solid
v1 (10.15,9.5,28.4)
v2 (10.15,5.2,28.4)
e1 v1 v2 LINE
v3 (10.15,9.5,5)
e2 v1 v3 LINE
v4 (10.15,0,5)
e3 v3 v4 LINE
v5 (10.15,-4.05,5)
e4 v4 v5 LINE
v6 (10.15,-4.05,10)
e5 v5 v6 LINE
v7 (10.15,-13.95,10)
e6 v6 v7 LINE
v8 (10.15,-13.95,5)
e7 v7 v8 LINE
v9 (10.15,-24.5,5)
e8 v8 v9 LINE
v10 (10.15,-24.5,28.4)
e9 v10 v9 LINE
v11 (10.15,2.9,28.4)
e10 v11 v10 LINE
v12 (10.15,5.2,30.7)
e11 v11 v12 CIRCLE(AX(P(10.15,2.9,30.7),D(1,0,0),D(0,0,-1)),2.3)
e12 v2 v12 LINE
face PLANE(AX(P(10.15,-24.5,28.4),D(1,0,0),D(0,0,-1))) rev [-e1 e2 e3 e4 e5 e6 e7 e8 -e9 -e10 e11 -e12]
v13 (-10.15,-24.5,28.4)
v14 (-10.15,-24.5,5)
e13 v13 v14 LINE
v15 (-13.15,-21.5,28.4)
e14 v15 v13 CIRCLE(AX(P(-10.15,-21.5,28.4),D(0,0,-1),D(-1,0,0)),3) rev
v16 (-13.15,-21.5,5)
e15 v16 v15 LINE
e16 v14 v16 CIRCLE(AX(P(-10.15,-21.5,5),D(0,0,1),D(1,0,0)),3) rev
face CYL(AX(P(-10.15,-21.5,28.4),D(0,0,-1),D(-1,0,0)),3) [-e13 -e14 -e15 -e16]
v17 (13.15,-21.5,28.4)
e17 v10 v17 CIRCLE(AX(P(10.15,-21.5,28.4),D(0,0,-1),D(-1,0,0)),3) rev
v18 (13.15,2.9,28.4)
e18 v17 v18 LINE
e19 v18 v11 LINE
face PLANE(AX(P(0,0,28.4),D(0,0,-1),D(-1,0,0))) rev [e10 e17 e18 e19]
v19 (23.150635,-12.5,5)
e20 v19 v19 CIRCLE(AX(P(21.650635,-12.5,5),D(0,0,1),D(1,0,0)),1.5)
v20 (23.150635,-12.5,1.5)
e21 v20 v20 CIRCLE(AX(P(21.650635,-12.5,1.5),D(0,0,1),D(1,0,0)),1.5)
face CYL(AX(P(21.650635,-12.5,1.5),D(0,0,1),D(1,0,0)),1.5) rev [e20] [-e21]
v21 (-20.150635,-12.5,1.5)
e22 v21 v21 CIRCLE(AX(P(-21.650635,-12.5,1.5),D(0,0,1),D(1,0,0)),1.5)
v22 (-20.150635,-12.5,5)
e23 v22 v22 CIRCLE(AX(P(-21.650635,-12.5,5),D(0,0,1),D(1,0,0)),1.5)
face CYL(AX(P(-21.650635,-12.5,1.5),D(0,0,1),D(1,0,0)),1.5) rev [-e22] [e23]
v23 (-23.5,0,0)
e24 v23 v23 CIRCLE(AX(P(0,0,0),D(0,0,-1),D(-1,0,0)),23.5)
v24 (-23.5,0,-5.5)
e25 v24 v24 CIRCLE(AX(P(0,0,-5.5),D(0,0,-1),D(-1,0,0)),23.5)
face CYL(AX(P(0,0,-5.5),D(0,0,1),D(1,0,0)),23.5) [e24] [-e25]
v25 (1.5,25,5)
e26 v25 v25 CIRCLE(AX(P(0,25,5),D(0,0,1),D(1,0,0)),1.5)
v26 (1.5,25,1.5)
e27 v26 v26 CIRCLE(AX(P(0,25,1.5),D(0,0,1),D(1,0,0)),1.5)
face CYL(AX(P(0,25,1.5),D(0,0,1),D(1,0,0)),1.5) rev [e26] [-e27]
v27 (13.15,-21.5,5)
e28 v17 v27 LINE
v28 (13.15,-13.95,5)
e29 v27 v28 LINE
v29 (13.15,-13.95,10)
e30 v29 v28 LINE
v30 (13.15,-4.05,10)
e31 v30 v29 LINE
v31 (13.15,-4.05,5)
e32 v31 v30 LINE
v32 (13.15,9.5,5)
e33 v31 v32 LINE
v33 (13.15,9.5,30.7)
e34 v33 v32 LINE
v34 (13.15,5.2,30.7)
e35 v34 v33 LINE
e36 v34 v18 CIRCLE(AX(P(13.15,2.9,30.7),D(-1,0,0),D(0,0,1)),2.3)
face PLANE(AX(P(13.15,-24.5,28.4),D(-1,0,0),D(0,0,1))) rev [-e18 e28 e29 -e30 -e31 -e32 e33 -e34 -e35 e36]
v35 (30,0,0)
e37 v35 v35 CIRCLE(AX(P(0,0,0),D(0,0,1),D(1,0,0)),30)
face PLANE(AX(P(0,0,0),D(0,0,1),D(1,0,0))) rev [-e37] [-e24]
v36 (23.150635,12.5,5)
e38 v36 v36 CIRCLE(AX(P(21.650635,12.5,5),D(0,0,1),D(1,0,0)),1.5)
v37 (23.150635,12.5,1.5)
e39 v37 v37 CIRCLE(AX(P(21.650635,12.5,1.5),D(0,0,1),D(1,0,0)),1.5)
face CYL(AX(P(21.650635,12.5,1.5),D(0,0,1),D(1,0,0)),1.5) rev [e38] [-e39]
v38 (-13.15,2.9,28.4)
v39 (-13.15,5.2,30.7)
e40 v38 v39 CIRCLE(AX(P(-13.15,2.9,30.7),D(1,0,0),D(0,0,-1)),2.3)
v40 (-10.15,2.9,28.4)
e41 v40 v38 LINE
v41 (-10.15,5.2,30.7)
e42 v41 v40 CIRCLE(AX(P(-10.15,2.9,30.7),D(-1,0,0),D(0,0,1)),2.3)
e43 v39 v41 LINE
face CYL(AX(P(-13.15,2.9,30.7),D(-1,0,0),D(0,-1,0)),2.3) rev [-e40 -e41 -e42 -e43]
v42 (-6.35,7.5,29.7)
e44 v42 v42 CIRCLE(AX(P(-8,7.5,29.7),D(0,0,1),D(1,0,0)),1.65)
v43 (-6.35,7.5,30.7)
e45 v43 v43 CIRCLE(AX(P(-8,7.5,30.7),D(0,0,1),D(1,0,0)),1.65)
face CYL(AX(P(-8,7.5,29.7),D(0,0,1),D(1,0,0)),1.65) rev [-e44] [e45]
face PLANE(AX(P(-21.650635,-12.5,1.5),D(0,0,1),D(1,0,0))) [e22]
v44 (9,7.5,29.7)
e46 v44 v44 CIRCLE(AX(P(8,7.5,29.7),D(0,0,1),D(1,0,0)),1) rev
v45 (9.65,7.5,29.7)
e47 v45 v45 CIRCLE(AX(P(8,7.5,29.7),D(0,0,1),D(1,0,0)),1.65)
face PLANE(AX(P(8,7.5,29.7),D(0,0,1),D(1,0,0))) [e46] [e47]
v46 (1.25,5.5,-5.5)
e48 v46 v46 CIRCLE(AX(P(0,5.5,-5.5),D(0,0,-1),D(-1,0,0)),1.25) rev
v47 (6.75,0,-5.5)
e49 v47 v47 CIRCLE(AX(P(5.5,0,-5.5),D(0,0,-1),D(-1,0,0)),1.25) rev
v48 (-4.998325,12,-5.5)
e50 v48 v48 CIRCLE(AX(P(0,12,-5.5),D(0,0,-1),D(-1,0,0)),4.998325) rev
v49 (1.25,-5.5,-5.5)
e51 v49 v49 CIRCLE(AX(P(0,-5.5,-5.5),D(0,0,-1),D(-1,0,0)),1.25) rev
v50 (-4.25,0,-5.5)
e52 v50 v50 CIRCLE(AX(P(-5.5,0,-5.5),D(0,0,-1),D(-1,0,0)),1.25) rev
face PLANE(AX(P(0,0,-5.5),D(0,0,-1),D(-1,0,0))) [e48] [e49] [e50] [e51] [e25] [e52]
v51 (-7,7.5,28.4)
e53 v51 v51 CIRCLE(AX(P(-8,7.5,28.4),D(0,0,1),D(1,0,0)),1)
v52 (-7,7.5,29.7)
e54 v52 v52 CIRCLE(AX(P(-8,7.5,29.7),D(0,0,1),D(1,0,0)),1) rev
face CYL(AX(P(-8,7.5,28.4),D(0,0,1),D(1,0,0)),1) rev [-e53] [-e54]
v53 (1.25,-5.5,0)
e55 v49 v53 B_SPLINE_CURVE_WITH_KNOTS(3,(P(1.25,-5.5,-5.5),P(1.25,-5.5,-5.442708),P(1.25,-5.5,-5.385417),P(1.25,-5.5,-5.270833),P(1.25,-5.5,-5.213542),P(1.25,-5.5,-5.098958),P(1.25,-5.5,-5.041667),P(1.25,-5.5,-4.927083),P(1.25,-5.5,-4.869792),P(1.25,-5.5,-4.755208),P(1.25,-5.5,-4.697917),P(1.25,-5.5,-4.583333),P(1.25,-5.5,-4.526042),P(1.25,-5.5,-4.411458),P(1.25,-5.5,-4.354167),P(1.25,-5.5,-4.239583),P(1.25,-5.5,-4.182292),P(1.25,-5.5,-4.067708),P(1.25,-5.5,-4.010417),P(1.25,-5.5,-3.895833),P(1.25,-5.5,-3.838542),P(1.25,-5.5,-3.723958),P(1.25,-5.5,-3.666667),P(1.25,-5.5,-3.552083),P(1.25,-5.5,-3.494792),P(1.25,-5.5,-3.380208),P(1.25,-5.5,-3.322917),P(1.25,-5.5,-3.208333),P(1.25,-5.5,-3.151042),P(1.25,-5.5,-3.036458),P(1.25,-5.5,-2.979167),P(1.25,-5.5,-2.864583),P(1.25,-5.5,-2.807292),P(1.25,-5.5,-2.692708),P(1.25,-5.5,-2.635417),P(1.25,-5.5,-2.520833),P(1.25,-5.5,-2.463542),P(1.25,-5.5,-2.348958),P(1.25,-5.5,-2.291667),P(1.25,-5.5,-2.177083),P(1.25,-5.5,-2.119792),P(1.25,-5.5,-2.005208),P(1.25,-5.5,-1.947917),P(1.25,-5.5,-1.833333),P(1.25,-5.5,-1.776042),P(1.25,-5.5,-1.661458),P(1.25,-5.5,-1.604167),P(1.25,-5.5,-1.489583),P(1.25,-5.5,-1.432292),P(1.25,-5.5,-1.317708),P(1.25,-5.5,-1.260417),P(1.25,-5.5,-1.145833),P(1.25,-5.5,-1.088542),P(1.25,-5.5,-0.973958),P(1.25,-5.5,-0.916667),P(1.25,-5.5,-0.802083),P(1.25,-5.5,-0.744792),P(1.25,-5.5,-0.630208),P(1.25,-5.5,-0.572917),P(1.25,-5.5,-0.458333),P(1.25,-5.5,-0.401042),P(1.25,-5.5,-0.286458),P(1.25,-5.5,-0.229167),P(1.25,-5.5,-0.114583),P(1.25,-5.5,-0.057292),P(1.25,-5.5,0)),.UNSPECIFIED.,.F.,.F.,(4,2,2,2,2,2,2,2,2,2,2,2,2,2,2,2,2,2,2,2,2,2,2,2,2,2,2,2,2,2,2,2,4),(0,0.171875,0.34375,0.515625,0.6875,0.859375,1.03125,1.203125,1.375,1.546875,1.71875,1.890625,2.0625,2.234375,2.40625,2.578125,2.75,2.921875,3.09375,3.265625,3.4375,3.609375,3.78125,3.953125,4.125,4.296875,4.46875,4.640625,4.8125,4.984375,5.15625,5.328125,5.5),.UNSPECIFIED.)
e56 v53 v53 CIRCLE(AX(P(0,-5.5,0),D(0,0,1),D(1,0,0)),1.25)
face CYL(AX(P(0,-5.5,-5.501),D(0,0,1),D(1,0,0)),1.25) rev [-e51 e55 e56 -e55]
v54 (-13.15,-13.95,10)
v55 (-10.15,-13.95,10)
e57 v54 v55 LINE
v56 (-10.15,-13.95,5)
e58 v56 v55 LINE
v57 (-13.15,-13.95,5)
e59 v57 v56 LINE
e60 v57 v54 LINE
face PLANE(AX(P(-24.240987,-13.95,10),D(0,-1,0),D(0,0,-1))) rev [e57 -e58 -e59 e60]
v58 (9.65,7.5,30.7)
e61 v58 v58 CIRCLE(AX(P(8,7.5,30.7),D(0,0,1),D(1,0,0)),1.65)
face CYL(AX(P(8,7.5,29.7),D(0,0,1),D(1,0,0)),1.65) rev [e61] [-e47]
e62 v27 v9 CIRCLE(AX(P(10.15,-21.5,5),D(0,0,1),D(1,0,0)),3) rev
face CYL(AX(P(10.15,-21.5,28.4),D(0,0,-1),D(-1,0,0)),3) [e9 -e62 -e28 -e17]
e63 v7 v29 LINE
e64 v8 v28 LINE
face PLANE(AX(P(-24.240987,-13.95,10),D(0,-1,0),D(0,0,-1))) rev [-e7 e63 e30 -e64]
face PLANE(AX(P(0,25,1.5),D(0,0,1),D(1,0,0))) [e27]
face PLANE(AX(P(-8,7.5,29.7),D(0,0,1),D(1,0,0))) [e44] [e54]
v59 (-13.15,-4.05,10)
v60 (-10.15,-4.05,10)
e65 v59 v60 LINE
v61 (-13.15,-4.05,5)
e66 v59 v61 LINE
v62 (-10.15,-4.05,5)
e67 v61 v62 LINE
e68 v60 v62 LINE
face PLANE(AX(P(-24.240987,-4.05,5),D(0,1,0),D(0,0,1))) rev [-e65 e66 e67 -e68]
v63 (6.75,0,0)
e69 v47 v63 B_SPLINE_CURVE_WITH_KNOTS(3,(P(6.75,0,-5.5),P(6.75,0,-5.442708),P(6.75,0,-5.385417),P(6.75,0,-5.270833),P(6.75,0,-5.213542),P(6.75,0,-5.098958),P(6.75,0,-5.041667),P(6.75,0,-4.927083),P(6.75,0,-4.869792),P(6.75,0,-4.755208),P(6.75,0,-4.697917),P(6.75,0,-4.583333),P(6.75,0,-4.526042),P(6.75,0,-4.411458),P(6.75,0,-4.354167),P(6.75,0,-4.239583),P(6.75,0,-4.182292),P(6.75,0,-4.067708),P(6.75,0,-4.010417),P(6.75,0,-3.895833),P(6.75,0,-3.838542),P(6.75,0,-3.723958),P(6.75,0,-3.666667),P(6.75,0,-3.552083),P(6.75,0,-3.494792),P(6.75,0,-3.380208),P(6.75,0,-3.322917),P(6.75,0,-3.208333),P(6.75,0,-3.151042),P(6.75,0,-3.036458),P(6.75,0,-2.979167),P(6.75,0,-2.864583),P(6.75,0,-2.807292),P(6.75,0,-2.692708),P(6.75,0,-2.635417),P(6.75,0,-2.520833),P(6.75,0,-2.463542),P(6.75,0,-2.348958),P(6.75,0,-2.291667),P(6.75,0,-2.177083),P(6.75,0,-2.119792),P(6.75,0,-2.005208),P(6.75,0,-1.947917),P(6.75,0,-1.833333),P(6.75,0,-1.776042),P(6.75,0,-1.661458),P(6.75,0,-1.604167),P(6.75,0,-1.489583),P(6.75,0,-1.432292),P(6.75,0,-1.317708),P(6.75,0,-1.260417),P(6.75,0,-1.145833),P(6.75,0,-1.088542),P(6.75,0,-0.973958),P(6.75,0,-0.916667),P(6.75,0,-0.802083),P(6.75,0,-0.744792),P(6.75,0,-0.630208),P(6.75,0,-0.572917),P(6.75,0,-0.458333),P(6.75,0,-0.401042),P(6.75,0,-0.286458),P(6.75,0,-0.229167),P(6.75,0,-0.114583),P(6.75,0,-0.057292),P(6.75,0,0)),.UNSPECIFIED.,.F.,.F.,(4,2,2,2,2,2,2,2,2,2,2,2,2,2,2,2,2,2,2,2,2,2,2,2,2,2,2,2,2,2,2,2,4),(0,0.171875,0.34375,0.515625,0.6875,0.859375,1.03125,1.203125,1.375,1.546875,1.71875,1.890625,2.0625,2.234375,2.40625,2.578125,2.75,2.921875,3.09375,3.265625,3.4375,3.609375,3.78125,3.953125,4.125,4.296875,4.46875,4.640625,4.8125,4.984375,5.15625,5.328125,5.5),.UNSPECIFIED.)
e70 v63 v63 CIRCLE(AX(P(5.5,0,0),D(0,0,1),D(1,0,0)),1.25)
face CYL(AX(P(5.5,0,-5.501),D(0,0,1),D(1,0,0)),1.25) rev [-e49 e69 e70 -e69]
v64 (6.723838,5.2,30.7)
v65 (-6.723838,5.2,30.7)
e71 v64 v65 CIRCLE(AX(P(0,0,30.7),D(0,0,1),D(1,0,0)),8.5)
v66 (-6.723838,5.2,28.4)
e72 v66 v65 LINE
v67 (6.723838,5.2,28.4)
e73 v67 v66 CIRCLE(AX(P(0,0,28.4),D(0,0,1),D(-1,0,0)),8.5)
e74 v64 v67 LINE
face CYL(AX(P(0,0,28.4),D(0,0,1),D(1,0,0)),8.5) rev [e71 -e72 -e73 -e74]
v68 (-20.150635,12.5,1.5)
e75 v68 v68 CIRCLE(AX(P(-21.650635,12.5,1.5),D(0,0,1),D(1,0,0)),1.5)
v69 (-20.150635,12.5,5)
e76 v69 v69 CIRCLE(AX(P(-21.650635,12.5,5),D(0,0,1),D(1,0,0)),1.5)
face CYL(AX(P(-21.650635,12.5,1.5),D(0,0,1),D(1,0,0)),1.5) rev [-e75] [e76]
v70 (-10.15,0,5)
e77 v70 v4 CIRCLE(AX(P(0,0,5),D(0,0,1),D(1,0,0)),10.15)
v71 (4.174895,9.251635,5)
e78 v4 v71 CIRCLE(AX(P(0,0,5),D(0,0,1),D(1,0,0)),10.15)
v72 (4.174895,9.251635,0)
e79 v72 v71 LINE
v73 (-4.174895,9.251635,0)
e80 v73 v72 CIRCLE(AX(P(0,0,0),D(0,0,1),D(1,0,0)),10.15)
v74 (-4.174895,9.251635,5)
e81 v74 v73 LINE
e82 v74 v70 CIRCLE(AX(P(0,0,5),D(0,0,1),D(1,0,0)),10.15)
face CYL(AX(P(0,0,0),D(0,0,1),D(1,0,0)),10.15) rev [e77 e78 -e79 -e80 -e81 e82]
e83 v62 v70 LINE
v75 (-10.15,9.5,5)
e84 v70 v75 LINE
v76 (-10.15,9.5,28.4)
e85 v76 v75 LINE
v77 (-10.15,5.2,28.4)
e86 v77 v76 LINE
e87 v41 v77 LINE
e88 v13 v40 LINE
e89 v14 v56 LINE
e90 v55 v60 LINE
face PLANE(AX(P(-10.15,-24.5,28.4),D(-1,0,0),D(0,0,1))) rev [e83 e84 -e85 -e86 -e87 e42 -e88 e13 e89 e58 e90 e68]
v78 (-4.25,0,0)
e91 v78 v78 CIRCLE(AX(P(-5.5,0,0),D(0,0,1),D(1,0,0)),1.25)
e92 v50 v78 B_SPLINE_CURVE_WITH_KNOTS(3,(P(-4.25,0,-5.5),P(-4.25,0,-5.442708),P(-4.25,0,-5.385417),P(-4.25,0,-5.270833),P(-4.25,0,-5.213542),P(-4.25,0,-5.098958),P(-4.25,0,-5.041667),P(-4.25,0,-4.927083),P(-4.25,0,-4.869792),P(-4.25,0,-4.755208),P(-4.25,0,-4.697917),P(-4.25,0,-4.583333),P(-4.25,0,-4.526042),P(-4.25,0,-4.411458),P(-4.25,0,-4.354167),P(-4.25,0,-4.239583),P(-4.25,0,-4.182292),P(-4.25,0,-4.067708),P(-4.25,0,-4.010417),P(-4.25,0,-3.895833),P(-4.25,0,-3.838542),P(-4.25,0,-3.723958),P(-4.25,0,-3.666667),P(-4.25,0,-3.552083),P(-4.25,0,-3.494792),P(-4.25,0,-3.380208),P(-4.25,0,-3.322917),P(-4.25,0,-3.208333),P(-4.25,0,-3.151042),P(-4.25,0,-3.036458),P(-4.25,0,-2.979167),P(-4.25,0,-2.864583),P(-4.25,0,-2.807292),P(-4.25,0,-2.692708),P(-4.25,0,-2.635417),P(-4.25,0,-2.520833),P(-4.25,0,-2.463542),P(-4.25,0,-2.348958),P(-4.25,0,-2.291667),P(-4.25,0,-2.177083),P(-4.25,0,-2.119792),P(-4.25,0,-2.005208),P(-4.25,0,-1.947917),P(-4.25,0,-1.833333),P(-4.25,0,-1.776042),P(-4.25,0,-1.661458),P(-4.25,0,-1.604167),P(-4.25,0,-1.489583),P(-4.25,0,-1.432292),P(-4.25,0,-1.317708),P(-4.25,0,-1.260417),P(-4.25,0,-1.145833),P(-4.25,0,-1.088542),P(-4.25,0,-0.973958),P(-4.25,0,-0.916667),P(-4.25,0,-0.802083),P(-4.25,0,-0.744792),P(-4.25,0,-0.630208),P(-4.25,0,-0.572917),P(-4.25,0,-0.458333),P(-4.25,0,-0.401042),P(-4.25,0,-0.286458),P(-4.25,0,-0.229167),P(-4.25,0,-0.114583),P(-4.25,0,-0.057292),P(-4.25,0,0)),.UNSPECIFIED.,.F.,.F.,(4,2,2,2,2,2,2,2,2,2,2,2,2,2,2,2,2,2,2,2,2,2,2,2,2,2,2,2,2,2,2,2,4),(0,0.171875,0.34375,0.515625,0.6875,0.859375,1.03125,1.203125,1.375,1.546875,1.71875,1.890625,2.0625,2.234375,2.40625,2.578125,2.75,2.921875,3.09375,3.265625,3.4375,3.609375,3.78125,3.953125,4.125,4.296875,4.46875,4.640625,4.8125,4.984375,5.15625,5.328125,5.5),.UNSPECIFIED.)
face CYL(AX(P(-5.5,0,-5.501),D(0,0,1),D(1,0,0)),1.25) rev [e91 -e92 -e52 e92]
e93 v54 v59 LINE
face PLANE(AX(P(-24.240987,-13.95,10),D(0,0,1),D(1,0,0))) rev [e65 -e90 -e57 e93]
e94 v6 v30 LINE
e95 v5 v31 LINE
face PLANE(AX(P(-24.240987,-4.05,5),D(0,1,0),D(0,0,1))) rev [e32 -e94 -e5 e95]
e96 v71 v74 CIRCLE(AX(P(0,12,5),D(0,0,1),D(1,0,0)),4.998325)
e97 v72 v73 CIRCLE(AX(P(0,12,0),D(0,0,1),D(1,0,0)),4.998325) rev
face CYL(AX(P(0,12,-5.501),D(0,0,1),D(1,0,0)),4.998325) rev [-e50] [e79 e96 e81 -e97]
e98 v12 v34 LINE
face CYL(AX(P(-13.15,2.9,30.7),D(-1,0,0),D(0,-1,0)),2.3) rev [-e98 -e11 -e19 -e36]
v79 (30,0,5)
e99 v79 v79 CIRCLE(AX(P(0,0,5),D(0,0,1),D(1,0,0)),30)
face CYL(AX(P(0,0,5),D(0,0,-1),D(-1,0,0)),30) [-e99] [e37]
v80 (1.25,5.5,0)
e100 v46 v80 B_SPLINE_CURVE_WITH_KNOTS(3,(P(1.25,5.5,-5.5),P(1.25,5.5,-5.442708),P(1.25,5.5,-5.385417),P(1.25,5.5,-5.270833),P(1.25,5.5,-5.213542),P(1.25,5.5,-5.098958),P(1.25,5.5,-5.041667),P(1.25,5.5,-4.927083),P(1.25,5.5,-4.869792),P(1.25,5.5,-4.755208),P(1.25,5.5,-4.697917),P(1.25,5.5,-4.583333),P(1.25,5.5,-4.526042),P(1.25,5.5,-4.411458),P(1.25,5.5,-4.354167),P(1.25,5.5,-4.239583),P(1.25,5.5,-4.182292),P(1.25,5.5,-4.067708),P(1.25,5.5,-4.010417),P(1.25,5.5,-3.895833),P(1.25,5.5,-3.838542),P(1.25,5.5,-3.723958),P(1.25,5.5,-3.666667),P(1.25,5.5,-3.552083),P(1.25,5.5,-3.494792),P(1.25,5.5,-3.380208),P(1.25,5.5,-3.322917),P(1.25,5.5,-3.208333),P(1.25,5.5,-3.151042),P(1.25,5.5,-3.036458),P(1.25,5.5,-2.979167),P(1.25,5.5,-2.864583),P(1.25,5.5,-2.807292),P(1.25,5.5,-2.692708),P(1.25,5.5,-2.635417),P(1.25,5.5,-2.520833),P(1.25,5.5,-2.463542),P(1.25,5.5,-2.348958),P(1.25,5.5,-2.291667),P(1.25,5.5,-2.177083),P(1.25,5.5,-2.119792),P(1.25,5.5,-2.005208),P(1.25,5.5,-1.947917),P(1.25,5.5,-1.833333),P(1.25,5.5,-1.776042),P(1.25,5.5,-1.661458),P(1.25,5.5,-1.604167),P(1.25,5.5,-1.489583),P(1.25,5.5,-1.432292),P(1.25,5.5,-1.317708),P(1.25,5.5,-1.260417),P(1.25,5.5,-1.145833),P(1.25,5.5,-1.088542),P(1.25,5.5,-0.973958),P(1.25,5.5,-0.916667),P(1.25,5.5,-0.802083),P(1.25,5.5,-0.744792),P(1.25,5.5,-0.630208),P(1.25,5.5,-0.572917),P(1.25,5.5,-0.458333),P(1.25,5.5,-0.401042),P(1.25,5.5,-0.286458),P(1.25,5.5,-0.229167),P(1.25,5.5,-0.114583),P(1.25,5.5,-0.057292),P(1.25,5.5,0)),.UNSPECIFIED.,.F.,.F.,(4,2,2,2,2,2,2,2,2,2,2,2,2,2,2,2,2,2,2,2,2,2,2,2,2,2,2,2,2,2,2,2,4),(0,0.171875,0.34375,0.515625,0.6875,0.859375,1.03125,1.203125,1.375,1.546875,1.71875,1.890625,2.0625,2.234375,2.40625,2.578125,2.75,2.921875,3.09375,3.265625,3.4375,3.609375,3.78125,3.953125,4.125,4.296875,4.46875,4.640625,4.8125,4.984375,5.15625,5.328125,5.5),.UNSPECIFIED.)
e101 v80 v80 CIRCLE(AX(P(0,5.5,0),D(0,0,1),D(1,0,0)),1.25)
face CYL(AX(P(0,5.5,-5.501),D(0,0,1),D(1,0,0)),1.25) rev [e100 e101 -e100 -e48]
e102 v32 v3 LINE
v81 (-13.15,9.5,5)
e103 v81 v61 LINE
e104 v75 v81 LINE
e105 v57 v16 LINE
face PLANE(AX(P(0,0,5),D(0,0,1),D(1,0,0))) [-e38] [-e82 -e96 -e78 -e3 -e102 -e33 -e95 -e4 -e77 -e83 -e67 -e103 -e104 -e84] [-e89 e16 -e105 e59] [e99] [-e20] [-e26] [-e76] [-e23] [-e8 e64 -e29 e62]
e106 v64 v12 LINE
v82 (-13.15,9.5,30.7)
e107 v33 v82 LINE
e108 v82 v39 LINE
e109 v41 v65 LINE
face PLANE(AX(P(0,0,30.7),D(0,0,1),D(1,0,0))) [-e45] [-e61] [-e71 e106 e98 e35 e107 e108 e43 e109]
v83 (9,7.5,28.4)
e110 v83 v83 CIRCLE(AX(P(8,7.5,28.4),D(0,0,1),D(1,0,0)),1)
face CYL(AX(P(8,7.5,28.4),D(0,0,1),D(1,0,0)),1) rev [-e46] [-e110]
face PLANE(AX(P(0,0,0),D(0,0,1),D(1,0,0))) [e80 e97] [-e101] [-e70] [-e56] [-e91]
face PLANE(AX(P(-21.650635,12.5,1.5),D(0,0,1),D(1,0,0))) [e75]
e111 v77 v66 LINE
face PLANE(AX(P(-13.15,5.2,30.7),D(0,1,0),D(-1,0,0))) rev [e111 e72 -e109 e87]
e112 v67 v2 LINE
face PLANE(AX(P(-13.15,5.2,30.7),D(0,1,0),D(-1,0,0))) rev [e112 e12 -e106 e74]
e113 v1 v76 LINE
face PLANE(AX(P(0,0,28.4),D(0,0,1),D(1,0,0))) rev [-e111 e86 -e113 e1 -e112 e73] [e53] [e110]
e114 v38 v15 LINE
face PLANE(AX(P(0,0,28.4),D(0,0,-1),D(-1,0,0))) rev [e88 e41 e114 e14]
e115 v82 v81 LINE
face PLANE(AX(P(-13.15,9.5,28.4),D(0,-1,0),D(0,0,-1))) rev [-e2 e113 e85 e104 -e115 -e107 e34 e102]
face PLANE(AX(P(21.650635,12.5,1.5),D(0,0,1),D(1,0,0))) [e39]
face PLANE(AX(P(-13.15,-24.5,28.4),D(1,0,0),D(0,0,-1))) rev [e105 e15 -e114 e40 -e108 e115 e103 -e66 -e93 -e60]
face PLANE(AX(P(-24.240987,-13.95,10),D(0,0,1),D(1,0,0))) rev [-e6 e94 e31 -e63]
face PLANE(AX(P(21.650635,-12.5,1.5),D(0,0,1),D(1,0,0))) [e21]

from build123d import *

# Parameters (mm, degrees)
CROQUIS2_R              = 30
SALIENTE_EXTRUIR1_DEPTH = 5
CROQUIS6_R              = 23.5
SALIENTE_EXTRUIR5_DEPTH = 5.5
CROQUIS7_W              = 3
CROQUIS7_H              = 34
SALIENTE_EXTRUIR6_DEPTH = 23.4
REDONDEO1_R             = 3
CROQUIS8_R              = 10.15
CORTAR_EXTRUIR1_DEPTH   = 5
CORTAR_EXTRUIR2_REACH   = 53.054
CROQUIS9_R              = 1.25
CROQUIS10_R             = 1.5
CORTAR_EXTRUIR3_DEPTH   = 3.5
CORTAR_EXTRUIR4_REACH   = 50.452
CROQUIS11_R             = 4.998325146
CORTAR_EXTRUIR5_REACH   = 61.737
CROQUIS12_W             = 5
CROQUIS12_H             = 9.9
CROQUIS13_W             = 26.3
CROQUIS13_H             = 4.3
SALIENTE_EXTRUIR7_DEPTH = 2.3
REDONDEO2_R             = 2.3
CORTAR_EXTRUIR6_DEPTH   = 2.3
CROQUIS16_R             = 1
CORTAR_EXTRUIR7_DEPTH   = 2.3
CROQUIS17_R             = 1.65
CORTAR_EXTRUIR8_DEPTH   = 1


with BuildPart() as part:
    # Croquis2 → Saliente-Extruir1 (new body)
    with BuildSketch(Plane.XY):
        Circle(CROQUIS2_R)
    extrude(amount=SALIENTE_EXTRUIR1_DEPTH)

    # Croquis6 → Saliente-Extruir5 (add)
    with BuildSketch(Plane(origin=(0, 0, 0), x_dir=(-1, 0, 0), z_dir=(0, 0, -1))):
        Circle(CROQUIS6_R)
    extrude(amount=SALIENTE_EXTRUIR5_DEPTH)

    # Croquis7 → Saliente-Extruir6 (add)
    with BuildSketch(Plane.XY.offset(5)):
        with Locations((-11.65, -7.5)):
            Rectangle(CROQUIS7_W, CROQUIS7_H)
        with Locations((11.65, -7.5)):
            Rectangle(CROQUIS7_W, CROQUIS7_H)
    extrude(amount=SALIENTE_EXTRUIR6_DEPTH)

    # Redondeo1
    redondeo1_edges = [part.edges().sort_by_distance(p)[0] for p in [
        (13.15, -24.5, 16.7),
        (-13.15, -24.5, 16.7),
    ]]
    fillet(redondeo1_edges, radius=REDONDEO1_R - 0.0001)  # a hair under: the kernel refuses the full size

    # Croquis8 → Cortar-Extruir1 (cut)
    with BuildSketch(Plane.XY.offset(5)):
        Circle(CROQUIS8_R)
    extrude(amount=-CORTAR_EXTRUIR1_DEPTH, mode=Mode.SUBTRACT)

    # Croquis9 → Cortar-Extruir2 (cut, up to next)
    with BuildSketch(Plane.XY, mode=Mode.PRIVATE) as cortar_extruir2_sk1:
        with Locations((0, 5.5)):
            Circle(CROQUIS9_R)
    cortar_extruir2_tool1 = extrude(cortar_extruir2_sk1.sketch, amount=-CORTAR_EXTRUIR2_REACH, mode=Mode.PRIVATE) & part.part
    # Croquis9 → Cortar-Extruir2 (cut, up to next)
    with BuildSketch(Plane.XY, mode=Mode.PRIVATE) as cortar_extruir2_sk2:
        with Locations((5.5, 0)):
            Circle(CROQUIS9_R)
    cortar_extruir2_tool2 = extrude(cortar_extruir2_sk2.sketch, amount=-CORTAR_EXTRUIR2_REACH, mode=Mode.PRIVATE) & part.part
    # Croquis9 → Cortar-Extruir2 (cut, up to next)
    with BuildSketch(Plane.XY, mode=Mode.PRIVATE) as cortar_extruir2_sk3:
        with Locations((0, -5.5)):
            Circle(CROQUIS9_R)
    cortar_extruir2_tool3 = extrude(cortar_extruir2_sk3.sketch, amount=-CORTAR_EXTRUIR2_REACH, mode=Mode.PRIVATE) & part.part
    # Croquis9 → Cortar-Extruir2 (cut, up to next)
    with BuildSketch(Plane.XY, mode=Mode.PRIVATE) as cortar_extruir2_sk4:
        with Locations((-5.5, 0)):
            Circle(CROQUIS9_R)
    cortar_extruir2_tool4 = extrude(cortar_extruir2_sk4.sketch, amount=-CORTAR_EXTRUIR2_REACH, mode=Mode.PRIVATE) & part.part
    add(cortar_extruir2_tool1.solids().sort_by_distance((0, 5.5, 0))[0], mode=Mode.SUBTRACT)
    add(cortar_extruir2_tool2.solids().sort_by_distance((5.5, 0, 0))[0], mode=Mode.SUBTRACT)
    add(cortar_extruir2_tool3.solids().sort_by_distance((0, -5.5, 0))[0], mode=Mode.SUBTRACT)
    add(cortar_extruir2_tool4.solids().sort_by_distance((-5.5, 0, 0))[0], mode=Mode.SUBTRACT)

    # Croquis10 → Cortar-Extruir3 (cut)
    with BuildSketch(Plane.XY.offset(5)):
        with Locations((21.650635095, -12.5)):
            Circle(CROQUIS10_R)
        with Locations((-21.650635095, -12.5)):
            Circle(CROQUIS10_R)
        with Locations((21.650635095, 12.5)):
            Circle(CROQUIS10_R)
        with Locations((-21.650635095, 12.5)):
            Circle(CROQUIS10_R)
        with Locations((0, 25)):
            Circle(CROQUIS10_R)
    extrude(amount=-CORTAR_EXTRUIR3_DEPTH, mode=Mode.SUBTRACT)

    # Croquis11 → Cortar-Extruir4 (cut, up to next)
    with BuildSketch(Plane.XY.offset(5), mode=Mode.PRIVATE) as cortar_extruir4_sk1:
        with Locations(Location((0, 12, 0), (0, 0, 326.642787388))):
            Circle(CROQUIS11_R)
    cortar_extruir4_tool1 = extrude(cortar_extruir4_sk1.sketch, amount=-CORTAR_EXTRUIR4_REACH, mode=Mode.PRIVATE) & part.part
    add(cortar_extruir4_tool1.solids().sort_by_distance((0, 12, 5))[0], mode=Mode.SUBTRACT)

    # Cortar-Extruir5: up to this face of the body (flat: up to its plane)
    cortar_extruir5_end = Plane(part.part.faces().sort_by_distance((-13.15, -6.00005, 16.7))[0])
    # Croquis12 → Cortar-Extruir5 (cut, up to the picked face)
    with BuildSketch(Plane(origin=(13.15, 0, 0), x_dir=(0, 0, -1), z_dir=(1, 0, 0)), mode=Mode.PRIVATE) as cortar_extruir5_sk1:
        with Locations((-7.5, -9)):
            Rectangle(CROQUIS12_W, CROQUIS12_H)
    cortar_extruir5_tool1 = split(extrude(cortar_extruir5_sk1.sketch, amount=-CORTAR_EXTRUIR5_REACH, mode=Mode.PRIVATE), bisect_by=cortar_extruir5_end, keep=Keep.BOTH, mode=Mode.PRIVATE)
    add(cortar_extruir5_tool1.solids().sort_by(Axis((13.15, -9, 7.5), (-1, 0, 0)))[0], mode=Mode.SUBTRACT)

    # Croquis13 → Saliente-Extruir7 (add)
    with BuildSketch(Plane.XY.offset(28.4)):
        with Locations((0, 7.35)):
            Rectangle(CROQUIS13_W, CROQUIS13_H)
    extrude(amount=SALIENTE_EXTRUIR7_DEPTH)

    # Redondeo2
    redondeo2_edges = [part.edges().sort_by_distance(p)[0] for p in [
        (11.65, 5.2, 28.4),
        (-11.65, 5.2, 28.4),
    ]]
    fillet(redondeo2_edges, radius=REDONDEO2_R - 0.0001)  # a hair under: the kernel refuses the full size

    # Croquis15 → Cortar-Extruir6 (cut)
    with BuildSketch(Plane.XY.offset(30.7)):
        with BuildLine():
            Line((-7.082372484, 4.7), (7.082372484, 4.7))
            ThreePointArc((7.082372484, 4.7), (0, 8.5), (-7.082372484, 4.7))
        make_face()
    extrude(amount=-CORTAR_EXTRUIR6_DEPTH, mode=Mode.SUBTRACT)

    # Croquis16 → Cortar-Extruir7 (cut)
    with BuildSketch(Plane.XY.offset(30.7)):
        with Locations((-8, 7.5)):
            Circle(CROQUIS16_R)
        with Locations((8, 7.5)):
            Circle(CROQUIS16_R)
    extrude(amount=-CORTAR_EXTRUIR7_DEPTH, mode=Mode.SUBTRACT)

    # Croquis17 → Cortar-Extruir8 (cut)
    with BuildSketch(Plane.XY.offset(30.7)):
        with Locations((-8, 7.5)):
            Circle(CROQUIS17_R)
        with Locations((8, 7.5)):
            Circle(CROQUIS17_R)
    extrude(amount=-CORTAR_EXTRUIR8_DEPTH, mode=Mode.SUBTRACT)


solid = part.part
